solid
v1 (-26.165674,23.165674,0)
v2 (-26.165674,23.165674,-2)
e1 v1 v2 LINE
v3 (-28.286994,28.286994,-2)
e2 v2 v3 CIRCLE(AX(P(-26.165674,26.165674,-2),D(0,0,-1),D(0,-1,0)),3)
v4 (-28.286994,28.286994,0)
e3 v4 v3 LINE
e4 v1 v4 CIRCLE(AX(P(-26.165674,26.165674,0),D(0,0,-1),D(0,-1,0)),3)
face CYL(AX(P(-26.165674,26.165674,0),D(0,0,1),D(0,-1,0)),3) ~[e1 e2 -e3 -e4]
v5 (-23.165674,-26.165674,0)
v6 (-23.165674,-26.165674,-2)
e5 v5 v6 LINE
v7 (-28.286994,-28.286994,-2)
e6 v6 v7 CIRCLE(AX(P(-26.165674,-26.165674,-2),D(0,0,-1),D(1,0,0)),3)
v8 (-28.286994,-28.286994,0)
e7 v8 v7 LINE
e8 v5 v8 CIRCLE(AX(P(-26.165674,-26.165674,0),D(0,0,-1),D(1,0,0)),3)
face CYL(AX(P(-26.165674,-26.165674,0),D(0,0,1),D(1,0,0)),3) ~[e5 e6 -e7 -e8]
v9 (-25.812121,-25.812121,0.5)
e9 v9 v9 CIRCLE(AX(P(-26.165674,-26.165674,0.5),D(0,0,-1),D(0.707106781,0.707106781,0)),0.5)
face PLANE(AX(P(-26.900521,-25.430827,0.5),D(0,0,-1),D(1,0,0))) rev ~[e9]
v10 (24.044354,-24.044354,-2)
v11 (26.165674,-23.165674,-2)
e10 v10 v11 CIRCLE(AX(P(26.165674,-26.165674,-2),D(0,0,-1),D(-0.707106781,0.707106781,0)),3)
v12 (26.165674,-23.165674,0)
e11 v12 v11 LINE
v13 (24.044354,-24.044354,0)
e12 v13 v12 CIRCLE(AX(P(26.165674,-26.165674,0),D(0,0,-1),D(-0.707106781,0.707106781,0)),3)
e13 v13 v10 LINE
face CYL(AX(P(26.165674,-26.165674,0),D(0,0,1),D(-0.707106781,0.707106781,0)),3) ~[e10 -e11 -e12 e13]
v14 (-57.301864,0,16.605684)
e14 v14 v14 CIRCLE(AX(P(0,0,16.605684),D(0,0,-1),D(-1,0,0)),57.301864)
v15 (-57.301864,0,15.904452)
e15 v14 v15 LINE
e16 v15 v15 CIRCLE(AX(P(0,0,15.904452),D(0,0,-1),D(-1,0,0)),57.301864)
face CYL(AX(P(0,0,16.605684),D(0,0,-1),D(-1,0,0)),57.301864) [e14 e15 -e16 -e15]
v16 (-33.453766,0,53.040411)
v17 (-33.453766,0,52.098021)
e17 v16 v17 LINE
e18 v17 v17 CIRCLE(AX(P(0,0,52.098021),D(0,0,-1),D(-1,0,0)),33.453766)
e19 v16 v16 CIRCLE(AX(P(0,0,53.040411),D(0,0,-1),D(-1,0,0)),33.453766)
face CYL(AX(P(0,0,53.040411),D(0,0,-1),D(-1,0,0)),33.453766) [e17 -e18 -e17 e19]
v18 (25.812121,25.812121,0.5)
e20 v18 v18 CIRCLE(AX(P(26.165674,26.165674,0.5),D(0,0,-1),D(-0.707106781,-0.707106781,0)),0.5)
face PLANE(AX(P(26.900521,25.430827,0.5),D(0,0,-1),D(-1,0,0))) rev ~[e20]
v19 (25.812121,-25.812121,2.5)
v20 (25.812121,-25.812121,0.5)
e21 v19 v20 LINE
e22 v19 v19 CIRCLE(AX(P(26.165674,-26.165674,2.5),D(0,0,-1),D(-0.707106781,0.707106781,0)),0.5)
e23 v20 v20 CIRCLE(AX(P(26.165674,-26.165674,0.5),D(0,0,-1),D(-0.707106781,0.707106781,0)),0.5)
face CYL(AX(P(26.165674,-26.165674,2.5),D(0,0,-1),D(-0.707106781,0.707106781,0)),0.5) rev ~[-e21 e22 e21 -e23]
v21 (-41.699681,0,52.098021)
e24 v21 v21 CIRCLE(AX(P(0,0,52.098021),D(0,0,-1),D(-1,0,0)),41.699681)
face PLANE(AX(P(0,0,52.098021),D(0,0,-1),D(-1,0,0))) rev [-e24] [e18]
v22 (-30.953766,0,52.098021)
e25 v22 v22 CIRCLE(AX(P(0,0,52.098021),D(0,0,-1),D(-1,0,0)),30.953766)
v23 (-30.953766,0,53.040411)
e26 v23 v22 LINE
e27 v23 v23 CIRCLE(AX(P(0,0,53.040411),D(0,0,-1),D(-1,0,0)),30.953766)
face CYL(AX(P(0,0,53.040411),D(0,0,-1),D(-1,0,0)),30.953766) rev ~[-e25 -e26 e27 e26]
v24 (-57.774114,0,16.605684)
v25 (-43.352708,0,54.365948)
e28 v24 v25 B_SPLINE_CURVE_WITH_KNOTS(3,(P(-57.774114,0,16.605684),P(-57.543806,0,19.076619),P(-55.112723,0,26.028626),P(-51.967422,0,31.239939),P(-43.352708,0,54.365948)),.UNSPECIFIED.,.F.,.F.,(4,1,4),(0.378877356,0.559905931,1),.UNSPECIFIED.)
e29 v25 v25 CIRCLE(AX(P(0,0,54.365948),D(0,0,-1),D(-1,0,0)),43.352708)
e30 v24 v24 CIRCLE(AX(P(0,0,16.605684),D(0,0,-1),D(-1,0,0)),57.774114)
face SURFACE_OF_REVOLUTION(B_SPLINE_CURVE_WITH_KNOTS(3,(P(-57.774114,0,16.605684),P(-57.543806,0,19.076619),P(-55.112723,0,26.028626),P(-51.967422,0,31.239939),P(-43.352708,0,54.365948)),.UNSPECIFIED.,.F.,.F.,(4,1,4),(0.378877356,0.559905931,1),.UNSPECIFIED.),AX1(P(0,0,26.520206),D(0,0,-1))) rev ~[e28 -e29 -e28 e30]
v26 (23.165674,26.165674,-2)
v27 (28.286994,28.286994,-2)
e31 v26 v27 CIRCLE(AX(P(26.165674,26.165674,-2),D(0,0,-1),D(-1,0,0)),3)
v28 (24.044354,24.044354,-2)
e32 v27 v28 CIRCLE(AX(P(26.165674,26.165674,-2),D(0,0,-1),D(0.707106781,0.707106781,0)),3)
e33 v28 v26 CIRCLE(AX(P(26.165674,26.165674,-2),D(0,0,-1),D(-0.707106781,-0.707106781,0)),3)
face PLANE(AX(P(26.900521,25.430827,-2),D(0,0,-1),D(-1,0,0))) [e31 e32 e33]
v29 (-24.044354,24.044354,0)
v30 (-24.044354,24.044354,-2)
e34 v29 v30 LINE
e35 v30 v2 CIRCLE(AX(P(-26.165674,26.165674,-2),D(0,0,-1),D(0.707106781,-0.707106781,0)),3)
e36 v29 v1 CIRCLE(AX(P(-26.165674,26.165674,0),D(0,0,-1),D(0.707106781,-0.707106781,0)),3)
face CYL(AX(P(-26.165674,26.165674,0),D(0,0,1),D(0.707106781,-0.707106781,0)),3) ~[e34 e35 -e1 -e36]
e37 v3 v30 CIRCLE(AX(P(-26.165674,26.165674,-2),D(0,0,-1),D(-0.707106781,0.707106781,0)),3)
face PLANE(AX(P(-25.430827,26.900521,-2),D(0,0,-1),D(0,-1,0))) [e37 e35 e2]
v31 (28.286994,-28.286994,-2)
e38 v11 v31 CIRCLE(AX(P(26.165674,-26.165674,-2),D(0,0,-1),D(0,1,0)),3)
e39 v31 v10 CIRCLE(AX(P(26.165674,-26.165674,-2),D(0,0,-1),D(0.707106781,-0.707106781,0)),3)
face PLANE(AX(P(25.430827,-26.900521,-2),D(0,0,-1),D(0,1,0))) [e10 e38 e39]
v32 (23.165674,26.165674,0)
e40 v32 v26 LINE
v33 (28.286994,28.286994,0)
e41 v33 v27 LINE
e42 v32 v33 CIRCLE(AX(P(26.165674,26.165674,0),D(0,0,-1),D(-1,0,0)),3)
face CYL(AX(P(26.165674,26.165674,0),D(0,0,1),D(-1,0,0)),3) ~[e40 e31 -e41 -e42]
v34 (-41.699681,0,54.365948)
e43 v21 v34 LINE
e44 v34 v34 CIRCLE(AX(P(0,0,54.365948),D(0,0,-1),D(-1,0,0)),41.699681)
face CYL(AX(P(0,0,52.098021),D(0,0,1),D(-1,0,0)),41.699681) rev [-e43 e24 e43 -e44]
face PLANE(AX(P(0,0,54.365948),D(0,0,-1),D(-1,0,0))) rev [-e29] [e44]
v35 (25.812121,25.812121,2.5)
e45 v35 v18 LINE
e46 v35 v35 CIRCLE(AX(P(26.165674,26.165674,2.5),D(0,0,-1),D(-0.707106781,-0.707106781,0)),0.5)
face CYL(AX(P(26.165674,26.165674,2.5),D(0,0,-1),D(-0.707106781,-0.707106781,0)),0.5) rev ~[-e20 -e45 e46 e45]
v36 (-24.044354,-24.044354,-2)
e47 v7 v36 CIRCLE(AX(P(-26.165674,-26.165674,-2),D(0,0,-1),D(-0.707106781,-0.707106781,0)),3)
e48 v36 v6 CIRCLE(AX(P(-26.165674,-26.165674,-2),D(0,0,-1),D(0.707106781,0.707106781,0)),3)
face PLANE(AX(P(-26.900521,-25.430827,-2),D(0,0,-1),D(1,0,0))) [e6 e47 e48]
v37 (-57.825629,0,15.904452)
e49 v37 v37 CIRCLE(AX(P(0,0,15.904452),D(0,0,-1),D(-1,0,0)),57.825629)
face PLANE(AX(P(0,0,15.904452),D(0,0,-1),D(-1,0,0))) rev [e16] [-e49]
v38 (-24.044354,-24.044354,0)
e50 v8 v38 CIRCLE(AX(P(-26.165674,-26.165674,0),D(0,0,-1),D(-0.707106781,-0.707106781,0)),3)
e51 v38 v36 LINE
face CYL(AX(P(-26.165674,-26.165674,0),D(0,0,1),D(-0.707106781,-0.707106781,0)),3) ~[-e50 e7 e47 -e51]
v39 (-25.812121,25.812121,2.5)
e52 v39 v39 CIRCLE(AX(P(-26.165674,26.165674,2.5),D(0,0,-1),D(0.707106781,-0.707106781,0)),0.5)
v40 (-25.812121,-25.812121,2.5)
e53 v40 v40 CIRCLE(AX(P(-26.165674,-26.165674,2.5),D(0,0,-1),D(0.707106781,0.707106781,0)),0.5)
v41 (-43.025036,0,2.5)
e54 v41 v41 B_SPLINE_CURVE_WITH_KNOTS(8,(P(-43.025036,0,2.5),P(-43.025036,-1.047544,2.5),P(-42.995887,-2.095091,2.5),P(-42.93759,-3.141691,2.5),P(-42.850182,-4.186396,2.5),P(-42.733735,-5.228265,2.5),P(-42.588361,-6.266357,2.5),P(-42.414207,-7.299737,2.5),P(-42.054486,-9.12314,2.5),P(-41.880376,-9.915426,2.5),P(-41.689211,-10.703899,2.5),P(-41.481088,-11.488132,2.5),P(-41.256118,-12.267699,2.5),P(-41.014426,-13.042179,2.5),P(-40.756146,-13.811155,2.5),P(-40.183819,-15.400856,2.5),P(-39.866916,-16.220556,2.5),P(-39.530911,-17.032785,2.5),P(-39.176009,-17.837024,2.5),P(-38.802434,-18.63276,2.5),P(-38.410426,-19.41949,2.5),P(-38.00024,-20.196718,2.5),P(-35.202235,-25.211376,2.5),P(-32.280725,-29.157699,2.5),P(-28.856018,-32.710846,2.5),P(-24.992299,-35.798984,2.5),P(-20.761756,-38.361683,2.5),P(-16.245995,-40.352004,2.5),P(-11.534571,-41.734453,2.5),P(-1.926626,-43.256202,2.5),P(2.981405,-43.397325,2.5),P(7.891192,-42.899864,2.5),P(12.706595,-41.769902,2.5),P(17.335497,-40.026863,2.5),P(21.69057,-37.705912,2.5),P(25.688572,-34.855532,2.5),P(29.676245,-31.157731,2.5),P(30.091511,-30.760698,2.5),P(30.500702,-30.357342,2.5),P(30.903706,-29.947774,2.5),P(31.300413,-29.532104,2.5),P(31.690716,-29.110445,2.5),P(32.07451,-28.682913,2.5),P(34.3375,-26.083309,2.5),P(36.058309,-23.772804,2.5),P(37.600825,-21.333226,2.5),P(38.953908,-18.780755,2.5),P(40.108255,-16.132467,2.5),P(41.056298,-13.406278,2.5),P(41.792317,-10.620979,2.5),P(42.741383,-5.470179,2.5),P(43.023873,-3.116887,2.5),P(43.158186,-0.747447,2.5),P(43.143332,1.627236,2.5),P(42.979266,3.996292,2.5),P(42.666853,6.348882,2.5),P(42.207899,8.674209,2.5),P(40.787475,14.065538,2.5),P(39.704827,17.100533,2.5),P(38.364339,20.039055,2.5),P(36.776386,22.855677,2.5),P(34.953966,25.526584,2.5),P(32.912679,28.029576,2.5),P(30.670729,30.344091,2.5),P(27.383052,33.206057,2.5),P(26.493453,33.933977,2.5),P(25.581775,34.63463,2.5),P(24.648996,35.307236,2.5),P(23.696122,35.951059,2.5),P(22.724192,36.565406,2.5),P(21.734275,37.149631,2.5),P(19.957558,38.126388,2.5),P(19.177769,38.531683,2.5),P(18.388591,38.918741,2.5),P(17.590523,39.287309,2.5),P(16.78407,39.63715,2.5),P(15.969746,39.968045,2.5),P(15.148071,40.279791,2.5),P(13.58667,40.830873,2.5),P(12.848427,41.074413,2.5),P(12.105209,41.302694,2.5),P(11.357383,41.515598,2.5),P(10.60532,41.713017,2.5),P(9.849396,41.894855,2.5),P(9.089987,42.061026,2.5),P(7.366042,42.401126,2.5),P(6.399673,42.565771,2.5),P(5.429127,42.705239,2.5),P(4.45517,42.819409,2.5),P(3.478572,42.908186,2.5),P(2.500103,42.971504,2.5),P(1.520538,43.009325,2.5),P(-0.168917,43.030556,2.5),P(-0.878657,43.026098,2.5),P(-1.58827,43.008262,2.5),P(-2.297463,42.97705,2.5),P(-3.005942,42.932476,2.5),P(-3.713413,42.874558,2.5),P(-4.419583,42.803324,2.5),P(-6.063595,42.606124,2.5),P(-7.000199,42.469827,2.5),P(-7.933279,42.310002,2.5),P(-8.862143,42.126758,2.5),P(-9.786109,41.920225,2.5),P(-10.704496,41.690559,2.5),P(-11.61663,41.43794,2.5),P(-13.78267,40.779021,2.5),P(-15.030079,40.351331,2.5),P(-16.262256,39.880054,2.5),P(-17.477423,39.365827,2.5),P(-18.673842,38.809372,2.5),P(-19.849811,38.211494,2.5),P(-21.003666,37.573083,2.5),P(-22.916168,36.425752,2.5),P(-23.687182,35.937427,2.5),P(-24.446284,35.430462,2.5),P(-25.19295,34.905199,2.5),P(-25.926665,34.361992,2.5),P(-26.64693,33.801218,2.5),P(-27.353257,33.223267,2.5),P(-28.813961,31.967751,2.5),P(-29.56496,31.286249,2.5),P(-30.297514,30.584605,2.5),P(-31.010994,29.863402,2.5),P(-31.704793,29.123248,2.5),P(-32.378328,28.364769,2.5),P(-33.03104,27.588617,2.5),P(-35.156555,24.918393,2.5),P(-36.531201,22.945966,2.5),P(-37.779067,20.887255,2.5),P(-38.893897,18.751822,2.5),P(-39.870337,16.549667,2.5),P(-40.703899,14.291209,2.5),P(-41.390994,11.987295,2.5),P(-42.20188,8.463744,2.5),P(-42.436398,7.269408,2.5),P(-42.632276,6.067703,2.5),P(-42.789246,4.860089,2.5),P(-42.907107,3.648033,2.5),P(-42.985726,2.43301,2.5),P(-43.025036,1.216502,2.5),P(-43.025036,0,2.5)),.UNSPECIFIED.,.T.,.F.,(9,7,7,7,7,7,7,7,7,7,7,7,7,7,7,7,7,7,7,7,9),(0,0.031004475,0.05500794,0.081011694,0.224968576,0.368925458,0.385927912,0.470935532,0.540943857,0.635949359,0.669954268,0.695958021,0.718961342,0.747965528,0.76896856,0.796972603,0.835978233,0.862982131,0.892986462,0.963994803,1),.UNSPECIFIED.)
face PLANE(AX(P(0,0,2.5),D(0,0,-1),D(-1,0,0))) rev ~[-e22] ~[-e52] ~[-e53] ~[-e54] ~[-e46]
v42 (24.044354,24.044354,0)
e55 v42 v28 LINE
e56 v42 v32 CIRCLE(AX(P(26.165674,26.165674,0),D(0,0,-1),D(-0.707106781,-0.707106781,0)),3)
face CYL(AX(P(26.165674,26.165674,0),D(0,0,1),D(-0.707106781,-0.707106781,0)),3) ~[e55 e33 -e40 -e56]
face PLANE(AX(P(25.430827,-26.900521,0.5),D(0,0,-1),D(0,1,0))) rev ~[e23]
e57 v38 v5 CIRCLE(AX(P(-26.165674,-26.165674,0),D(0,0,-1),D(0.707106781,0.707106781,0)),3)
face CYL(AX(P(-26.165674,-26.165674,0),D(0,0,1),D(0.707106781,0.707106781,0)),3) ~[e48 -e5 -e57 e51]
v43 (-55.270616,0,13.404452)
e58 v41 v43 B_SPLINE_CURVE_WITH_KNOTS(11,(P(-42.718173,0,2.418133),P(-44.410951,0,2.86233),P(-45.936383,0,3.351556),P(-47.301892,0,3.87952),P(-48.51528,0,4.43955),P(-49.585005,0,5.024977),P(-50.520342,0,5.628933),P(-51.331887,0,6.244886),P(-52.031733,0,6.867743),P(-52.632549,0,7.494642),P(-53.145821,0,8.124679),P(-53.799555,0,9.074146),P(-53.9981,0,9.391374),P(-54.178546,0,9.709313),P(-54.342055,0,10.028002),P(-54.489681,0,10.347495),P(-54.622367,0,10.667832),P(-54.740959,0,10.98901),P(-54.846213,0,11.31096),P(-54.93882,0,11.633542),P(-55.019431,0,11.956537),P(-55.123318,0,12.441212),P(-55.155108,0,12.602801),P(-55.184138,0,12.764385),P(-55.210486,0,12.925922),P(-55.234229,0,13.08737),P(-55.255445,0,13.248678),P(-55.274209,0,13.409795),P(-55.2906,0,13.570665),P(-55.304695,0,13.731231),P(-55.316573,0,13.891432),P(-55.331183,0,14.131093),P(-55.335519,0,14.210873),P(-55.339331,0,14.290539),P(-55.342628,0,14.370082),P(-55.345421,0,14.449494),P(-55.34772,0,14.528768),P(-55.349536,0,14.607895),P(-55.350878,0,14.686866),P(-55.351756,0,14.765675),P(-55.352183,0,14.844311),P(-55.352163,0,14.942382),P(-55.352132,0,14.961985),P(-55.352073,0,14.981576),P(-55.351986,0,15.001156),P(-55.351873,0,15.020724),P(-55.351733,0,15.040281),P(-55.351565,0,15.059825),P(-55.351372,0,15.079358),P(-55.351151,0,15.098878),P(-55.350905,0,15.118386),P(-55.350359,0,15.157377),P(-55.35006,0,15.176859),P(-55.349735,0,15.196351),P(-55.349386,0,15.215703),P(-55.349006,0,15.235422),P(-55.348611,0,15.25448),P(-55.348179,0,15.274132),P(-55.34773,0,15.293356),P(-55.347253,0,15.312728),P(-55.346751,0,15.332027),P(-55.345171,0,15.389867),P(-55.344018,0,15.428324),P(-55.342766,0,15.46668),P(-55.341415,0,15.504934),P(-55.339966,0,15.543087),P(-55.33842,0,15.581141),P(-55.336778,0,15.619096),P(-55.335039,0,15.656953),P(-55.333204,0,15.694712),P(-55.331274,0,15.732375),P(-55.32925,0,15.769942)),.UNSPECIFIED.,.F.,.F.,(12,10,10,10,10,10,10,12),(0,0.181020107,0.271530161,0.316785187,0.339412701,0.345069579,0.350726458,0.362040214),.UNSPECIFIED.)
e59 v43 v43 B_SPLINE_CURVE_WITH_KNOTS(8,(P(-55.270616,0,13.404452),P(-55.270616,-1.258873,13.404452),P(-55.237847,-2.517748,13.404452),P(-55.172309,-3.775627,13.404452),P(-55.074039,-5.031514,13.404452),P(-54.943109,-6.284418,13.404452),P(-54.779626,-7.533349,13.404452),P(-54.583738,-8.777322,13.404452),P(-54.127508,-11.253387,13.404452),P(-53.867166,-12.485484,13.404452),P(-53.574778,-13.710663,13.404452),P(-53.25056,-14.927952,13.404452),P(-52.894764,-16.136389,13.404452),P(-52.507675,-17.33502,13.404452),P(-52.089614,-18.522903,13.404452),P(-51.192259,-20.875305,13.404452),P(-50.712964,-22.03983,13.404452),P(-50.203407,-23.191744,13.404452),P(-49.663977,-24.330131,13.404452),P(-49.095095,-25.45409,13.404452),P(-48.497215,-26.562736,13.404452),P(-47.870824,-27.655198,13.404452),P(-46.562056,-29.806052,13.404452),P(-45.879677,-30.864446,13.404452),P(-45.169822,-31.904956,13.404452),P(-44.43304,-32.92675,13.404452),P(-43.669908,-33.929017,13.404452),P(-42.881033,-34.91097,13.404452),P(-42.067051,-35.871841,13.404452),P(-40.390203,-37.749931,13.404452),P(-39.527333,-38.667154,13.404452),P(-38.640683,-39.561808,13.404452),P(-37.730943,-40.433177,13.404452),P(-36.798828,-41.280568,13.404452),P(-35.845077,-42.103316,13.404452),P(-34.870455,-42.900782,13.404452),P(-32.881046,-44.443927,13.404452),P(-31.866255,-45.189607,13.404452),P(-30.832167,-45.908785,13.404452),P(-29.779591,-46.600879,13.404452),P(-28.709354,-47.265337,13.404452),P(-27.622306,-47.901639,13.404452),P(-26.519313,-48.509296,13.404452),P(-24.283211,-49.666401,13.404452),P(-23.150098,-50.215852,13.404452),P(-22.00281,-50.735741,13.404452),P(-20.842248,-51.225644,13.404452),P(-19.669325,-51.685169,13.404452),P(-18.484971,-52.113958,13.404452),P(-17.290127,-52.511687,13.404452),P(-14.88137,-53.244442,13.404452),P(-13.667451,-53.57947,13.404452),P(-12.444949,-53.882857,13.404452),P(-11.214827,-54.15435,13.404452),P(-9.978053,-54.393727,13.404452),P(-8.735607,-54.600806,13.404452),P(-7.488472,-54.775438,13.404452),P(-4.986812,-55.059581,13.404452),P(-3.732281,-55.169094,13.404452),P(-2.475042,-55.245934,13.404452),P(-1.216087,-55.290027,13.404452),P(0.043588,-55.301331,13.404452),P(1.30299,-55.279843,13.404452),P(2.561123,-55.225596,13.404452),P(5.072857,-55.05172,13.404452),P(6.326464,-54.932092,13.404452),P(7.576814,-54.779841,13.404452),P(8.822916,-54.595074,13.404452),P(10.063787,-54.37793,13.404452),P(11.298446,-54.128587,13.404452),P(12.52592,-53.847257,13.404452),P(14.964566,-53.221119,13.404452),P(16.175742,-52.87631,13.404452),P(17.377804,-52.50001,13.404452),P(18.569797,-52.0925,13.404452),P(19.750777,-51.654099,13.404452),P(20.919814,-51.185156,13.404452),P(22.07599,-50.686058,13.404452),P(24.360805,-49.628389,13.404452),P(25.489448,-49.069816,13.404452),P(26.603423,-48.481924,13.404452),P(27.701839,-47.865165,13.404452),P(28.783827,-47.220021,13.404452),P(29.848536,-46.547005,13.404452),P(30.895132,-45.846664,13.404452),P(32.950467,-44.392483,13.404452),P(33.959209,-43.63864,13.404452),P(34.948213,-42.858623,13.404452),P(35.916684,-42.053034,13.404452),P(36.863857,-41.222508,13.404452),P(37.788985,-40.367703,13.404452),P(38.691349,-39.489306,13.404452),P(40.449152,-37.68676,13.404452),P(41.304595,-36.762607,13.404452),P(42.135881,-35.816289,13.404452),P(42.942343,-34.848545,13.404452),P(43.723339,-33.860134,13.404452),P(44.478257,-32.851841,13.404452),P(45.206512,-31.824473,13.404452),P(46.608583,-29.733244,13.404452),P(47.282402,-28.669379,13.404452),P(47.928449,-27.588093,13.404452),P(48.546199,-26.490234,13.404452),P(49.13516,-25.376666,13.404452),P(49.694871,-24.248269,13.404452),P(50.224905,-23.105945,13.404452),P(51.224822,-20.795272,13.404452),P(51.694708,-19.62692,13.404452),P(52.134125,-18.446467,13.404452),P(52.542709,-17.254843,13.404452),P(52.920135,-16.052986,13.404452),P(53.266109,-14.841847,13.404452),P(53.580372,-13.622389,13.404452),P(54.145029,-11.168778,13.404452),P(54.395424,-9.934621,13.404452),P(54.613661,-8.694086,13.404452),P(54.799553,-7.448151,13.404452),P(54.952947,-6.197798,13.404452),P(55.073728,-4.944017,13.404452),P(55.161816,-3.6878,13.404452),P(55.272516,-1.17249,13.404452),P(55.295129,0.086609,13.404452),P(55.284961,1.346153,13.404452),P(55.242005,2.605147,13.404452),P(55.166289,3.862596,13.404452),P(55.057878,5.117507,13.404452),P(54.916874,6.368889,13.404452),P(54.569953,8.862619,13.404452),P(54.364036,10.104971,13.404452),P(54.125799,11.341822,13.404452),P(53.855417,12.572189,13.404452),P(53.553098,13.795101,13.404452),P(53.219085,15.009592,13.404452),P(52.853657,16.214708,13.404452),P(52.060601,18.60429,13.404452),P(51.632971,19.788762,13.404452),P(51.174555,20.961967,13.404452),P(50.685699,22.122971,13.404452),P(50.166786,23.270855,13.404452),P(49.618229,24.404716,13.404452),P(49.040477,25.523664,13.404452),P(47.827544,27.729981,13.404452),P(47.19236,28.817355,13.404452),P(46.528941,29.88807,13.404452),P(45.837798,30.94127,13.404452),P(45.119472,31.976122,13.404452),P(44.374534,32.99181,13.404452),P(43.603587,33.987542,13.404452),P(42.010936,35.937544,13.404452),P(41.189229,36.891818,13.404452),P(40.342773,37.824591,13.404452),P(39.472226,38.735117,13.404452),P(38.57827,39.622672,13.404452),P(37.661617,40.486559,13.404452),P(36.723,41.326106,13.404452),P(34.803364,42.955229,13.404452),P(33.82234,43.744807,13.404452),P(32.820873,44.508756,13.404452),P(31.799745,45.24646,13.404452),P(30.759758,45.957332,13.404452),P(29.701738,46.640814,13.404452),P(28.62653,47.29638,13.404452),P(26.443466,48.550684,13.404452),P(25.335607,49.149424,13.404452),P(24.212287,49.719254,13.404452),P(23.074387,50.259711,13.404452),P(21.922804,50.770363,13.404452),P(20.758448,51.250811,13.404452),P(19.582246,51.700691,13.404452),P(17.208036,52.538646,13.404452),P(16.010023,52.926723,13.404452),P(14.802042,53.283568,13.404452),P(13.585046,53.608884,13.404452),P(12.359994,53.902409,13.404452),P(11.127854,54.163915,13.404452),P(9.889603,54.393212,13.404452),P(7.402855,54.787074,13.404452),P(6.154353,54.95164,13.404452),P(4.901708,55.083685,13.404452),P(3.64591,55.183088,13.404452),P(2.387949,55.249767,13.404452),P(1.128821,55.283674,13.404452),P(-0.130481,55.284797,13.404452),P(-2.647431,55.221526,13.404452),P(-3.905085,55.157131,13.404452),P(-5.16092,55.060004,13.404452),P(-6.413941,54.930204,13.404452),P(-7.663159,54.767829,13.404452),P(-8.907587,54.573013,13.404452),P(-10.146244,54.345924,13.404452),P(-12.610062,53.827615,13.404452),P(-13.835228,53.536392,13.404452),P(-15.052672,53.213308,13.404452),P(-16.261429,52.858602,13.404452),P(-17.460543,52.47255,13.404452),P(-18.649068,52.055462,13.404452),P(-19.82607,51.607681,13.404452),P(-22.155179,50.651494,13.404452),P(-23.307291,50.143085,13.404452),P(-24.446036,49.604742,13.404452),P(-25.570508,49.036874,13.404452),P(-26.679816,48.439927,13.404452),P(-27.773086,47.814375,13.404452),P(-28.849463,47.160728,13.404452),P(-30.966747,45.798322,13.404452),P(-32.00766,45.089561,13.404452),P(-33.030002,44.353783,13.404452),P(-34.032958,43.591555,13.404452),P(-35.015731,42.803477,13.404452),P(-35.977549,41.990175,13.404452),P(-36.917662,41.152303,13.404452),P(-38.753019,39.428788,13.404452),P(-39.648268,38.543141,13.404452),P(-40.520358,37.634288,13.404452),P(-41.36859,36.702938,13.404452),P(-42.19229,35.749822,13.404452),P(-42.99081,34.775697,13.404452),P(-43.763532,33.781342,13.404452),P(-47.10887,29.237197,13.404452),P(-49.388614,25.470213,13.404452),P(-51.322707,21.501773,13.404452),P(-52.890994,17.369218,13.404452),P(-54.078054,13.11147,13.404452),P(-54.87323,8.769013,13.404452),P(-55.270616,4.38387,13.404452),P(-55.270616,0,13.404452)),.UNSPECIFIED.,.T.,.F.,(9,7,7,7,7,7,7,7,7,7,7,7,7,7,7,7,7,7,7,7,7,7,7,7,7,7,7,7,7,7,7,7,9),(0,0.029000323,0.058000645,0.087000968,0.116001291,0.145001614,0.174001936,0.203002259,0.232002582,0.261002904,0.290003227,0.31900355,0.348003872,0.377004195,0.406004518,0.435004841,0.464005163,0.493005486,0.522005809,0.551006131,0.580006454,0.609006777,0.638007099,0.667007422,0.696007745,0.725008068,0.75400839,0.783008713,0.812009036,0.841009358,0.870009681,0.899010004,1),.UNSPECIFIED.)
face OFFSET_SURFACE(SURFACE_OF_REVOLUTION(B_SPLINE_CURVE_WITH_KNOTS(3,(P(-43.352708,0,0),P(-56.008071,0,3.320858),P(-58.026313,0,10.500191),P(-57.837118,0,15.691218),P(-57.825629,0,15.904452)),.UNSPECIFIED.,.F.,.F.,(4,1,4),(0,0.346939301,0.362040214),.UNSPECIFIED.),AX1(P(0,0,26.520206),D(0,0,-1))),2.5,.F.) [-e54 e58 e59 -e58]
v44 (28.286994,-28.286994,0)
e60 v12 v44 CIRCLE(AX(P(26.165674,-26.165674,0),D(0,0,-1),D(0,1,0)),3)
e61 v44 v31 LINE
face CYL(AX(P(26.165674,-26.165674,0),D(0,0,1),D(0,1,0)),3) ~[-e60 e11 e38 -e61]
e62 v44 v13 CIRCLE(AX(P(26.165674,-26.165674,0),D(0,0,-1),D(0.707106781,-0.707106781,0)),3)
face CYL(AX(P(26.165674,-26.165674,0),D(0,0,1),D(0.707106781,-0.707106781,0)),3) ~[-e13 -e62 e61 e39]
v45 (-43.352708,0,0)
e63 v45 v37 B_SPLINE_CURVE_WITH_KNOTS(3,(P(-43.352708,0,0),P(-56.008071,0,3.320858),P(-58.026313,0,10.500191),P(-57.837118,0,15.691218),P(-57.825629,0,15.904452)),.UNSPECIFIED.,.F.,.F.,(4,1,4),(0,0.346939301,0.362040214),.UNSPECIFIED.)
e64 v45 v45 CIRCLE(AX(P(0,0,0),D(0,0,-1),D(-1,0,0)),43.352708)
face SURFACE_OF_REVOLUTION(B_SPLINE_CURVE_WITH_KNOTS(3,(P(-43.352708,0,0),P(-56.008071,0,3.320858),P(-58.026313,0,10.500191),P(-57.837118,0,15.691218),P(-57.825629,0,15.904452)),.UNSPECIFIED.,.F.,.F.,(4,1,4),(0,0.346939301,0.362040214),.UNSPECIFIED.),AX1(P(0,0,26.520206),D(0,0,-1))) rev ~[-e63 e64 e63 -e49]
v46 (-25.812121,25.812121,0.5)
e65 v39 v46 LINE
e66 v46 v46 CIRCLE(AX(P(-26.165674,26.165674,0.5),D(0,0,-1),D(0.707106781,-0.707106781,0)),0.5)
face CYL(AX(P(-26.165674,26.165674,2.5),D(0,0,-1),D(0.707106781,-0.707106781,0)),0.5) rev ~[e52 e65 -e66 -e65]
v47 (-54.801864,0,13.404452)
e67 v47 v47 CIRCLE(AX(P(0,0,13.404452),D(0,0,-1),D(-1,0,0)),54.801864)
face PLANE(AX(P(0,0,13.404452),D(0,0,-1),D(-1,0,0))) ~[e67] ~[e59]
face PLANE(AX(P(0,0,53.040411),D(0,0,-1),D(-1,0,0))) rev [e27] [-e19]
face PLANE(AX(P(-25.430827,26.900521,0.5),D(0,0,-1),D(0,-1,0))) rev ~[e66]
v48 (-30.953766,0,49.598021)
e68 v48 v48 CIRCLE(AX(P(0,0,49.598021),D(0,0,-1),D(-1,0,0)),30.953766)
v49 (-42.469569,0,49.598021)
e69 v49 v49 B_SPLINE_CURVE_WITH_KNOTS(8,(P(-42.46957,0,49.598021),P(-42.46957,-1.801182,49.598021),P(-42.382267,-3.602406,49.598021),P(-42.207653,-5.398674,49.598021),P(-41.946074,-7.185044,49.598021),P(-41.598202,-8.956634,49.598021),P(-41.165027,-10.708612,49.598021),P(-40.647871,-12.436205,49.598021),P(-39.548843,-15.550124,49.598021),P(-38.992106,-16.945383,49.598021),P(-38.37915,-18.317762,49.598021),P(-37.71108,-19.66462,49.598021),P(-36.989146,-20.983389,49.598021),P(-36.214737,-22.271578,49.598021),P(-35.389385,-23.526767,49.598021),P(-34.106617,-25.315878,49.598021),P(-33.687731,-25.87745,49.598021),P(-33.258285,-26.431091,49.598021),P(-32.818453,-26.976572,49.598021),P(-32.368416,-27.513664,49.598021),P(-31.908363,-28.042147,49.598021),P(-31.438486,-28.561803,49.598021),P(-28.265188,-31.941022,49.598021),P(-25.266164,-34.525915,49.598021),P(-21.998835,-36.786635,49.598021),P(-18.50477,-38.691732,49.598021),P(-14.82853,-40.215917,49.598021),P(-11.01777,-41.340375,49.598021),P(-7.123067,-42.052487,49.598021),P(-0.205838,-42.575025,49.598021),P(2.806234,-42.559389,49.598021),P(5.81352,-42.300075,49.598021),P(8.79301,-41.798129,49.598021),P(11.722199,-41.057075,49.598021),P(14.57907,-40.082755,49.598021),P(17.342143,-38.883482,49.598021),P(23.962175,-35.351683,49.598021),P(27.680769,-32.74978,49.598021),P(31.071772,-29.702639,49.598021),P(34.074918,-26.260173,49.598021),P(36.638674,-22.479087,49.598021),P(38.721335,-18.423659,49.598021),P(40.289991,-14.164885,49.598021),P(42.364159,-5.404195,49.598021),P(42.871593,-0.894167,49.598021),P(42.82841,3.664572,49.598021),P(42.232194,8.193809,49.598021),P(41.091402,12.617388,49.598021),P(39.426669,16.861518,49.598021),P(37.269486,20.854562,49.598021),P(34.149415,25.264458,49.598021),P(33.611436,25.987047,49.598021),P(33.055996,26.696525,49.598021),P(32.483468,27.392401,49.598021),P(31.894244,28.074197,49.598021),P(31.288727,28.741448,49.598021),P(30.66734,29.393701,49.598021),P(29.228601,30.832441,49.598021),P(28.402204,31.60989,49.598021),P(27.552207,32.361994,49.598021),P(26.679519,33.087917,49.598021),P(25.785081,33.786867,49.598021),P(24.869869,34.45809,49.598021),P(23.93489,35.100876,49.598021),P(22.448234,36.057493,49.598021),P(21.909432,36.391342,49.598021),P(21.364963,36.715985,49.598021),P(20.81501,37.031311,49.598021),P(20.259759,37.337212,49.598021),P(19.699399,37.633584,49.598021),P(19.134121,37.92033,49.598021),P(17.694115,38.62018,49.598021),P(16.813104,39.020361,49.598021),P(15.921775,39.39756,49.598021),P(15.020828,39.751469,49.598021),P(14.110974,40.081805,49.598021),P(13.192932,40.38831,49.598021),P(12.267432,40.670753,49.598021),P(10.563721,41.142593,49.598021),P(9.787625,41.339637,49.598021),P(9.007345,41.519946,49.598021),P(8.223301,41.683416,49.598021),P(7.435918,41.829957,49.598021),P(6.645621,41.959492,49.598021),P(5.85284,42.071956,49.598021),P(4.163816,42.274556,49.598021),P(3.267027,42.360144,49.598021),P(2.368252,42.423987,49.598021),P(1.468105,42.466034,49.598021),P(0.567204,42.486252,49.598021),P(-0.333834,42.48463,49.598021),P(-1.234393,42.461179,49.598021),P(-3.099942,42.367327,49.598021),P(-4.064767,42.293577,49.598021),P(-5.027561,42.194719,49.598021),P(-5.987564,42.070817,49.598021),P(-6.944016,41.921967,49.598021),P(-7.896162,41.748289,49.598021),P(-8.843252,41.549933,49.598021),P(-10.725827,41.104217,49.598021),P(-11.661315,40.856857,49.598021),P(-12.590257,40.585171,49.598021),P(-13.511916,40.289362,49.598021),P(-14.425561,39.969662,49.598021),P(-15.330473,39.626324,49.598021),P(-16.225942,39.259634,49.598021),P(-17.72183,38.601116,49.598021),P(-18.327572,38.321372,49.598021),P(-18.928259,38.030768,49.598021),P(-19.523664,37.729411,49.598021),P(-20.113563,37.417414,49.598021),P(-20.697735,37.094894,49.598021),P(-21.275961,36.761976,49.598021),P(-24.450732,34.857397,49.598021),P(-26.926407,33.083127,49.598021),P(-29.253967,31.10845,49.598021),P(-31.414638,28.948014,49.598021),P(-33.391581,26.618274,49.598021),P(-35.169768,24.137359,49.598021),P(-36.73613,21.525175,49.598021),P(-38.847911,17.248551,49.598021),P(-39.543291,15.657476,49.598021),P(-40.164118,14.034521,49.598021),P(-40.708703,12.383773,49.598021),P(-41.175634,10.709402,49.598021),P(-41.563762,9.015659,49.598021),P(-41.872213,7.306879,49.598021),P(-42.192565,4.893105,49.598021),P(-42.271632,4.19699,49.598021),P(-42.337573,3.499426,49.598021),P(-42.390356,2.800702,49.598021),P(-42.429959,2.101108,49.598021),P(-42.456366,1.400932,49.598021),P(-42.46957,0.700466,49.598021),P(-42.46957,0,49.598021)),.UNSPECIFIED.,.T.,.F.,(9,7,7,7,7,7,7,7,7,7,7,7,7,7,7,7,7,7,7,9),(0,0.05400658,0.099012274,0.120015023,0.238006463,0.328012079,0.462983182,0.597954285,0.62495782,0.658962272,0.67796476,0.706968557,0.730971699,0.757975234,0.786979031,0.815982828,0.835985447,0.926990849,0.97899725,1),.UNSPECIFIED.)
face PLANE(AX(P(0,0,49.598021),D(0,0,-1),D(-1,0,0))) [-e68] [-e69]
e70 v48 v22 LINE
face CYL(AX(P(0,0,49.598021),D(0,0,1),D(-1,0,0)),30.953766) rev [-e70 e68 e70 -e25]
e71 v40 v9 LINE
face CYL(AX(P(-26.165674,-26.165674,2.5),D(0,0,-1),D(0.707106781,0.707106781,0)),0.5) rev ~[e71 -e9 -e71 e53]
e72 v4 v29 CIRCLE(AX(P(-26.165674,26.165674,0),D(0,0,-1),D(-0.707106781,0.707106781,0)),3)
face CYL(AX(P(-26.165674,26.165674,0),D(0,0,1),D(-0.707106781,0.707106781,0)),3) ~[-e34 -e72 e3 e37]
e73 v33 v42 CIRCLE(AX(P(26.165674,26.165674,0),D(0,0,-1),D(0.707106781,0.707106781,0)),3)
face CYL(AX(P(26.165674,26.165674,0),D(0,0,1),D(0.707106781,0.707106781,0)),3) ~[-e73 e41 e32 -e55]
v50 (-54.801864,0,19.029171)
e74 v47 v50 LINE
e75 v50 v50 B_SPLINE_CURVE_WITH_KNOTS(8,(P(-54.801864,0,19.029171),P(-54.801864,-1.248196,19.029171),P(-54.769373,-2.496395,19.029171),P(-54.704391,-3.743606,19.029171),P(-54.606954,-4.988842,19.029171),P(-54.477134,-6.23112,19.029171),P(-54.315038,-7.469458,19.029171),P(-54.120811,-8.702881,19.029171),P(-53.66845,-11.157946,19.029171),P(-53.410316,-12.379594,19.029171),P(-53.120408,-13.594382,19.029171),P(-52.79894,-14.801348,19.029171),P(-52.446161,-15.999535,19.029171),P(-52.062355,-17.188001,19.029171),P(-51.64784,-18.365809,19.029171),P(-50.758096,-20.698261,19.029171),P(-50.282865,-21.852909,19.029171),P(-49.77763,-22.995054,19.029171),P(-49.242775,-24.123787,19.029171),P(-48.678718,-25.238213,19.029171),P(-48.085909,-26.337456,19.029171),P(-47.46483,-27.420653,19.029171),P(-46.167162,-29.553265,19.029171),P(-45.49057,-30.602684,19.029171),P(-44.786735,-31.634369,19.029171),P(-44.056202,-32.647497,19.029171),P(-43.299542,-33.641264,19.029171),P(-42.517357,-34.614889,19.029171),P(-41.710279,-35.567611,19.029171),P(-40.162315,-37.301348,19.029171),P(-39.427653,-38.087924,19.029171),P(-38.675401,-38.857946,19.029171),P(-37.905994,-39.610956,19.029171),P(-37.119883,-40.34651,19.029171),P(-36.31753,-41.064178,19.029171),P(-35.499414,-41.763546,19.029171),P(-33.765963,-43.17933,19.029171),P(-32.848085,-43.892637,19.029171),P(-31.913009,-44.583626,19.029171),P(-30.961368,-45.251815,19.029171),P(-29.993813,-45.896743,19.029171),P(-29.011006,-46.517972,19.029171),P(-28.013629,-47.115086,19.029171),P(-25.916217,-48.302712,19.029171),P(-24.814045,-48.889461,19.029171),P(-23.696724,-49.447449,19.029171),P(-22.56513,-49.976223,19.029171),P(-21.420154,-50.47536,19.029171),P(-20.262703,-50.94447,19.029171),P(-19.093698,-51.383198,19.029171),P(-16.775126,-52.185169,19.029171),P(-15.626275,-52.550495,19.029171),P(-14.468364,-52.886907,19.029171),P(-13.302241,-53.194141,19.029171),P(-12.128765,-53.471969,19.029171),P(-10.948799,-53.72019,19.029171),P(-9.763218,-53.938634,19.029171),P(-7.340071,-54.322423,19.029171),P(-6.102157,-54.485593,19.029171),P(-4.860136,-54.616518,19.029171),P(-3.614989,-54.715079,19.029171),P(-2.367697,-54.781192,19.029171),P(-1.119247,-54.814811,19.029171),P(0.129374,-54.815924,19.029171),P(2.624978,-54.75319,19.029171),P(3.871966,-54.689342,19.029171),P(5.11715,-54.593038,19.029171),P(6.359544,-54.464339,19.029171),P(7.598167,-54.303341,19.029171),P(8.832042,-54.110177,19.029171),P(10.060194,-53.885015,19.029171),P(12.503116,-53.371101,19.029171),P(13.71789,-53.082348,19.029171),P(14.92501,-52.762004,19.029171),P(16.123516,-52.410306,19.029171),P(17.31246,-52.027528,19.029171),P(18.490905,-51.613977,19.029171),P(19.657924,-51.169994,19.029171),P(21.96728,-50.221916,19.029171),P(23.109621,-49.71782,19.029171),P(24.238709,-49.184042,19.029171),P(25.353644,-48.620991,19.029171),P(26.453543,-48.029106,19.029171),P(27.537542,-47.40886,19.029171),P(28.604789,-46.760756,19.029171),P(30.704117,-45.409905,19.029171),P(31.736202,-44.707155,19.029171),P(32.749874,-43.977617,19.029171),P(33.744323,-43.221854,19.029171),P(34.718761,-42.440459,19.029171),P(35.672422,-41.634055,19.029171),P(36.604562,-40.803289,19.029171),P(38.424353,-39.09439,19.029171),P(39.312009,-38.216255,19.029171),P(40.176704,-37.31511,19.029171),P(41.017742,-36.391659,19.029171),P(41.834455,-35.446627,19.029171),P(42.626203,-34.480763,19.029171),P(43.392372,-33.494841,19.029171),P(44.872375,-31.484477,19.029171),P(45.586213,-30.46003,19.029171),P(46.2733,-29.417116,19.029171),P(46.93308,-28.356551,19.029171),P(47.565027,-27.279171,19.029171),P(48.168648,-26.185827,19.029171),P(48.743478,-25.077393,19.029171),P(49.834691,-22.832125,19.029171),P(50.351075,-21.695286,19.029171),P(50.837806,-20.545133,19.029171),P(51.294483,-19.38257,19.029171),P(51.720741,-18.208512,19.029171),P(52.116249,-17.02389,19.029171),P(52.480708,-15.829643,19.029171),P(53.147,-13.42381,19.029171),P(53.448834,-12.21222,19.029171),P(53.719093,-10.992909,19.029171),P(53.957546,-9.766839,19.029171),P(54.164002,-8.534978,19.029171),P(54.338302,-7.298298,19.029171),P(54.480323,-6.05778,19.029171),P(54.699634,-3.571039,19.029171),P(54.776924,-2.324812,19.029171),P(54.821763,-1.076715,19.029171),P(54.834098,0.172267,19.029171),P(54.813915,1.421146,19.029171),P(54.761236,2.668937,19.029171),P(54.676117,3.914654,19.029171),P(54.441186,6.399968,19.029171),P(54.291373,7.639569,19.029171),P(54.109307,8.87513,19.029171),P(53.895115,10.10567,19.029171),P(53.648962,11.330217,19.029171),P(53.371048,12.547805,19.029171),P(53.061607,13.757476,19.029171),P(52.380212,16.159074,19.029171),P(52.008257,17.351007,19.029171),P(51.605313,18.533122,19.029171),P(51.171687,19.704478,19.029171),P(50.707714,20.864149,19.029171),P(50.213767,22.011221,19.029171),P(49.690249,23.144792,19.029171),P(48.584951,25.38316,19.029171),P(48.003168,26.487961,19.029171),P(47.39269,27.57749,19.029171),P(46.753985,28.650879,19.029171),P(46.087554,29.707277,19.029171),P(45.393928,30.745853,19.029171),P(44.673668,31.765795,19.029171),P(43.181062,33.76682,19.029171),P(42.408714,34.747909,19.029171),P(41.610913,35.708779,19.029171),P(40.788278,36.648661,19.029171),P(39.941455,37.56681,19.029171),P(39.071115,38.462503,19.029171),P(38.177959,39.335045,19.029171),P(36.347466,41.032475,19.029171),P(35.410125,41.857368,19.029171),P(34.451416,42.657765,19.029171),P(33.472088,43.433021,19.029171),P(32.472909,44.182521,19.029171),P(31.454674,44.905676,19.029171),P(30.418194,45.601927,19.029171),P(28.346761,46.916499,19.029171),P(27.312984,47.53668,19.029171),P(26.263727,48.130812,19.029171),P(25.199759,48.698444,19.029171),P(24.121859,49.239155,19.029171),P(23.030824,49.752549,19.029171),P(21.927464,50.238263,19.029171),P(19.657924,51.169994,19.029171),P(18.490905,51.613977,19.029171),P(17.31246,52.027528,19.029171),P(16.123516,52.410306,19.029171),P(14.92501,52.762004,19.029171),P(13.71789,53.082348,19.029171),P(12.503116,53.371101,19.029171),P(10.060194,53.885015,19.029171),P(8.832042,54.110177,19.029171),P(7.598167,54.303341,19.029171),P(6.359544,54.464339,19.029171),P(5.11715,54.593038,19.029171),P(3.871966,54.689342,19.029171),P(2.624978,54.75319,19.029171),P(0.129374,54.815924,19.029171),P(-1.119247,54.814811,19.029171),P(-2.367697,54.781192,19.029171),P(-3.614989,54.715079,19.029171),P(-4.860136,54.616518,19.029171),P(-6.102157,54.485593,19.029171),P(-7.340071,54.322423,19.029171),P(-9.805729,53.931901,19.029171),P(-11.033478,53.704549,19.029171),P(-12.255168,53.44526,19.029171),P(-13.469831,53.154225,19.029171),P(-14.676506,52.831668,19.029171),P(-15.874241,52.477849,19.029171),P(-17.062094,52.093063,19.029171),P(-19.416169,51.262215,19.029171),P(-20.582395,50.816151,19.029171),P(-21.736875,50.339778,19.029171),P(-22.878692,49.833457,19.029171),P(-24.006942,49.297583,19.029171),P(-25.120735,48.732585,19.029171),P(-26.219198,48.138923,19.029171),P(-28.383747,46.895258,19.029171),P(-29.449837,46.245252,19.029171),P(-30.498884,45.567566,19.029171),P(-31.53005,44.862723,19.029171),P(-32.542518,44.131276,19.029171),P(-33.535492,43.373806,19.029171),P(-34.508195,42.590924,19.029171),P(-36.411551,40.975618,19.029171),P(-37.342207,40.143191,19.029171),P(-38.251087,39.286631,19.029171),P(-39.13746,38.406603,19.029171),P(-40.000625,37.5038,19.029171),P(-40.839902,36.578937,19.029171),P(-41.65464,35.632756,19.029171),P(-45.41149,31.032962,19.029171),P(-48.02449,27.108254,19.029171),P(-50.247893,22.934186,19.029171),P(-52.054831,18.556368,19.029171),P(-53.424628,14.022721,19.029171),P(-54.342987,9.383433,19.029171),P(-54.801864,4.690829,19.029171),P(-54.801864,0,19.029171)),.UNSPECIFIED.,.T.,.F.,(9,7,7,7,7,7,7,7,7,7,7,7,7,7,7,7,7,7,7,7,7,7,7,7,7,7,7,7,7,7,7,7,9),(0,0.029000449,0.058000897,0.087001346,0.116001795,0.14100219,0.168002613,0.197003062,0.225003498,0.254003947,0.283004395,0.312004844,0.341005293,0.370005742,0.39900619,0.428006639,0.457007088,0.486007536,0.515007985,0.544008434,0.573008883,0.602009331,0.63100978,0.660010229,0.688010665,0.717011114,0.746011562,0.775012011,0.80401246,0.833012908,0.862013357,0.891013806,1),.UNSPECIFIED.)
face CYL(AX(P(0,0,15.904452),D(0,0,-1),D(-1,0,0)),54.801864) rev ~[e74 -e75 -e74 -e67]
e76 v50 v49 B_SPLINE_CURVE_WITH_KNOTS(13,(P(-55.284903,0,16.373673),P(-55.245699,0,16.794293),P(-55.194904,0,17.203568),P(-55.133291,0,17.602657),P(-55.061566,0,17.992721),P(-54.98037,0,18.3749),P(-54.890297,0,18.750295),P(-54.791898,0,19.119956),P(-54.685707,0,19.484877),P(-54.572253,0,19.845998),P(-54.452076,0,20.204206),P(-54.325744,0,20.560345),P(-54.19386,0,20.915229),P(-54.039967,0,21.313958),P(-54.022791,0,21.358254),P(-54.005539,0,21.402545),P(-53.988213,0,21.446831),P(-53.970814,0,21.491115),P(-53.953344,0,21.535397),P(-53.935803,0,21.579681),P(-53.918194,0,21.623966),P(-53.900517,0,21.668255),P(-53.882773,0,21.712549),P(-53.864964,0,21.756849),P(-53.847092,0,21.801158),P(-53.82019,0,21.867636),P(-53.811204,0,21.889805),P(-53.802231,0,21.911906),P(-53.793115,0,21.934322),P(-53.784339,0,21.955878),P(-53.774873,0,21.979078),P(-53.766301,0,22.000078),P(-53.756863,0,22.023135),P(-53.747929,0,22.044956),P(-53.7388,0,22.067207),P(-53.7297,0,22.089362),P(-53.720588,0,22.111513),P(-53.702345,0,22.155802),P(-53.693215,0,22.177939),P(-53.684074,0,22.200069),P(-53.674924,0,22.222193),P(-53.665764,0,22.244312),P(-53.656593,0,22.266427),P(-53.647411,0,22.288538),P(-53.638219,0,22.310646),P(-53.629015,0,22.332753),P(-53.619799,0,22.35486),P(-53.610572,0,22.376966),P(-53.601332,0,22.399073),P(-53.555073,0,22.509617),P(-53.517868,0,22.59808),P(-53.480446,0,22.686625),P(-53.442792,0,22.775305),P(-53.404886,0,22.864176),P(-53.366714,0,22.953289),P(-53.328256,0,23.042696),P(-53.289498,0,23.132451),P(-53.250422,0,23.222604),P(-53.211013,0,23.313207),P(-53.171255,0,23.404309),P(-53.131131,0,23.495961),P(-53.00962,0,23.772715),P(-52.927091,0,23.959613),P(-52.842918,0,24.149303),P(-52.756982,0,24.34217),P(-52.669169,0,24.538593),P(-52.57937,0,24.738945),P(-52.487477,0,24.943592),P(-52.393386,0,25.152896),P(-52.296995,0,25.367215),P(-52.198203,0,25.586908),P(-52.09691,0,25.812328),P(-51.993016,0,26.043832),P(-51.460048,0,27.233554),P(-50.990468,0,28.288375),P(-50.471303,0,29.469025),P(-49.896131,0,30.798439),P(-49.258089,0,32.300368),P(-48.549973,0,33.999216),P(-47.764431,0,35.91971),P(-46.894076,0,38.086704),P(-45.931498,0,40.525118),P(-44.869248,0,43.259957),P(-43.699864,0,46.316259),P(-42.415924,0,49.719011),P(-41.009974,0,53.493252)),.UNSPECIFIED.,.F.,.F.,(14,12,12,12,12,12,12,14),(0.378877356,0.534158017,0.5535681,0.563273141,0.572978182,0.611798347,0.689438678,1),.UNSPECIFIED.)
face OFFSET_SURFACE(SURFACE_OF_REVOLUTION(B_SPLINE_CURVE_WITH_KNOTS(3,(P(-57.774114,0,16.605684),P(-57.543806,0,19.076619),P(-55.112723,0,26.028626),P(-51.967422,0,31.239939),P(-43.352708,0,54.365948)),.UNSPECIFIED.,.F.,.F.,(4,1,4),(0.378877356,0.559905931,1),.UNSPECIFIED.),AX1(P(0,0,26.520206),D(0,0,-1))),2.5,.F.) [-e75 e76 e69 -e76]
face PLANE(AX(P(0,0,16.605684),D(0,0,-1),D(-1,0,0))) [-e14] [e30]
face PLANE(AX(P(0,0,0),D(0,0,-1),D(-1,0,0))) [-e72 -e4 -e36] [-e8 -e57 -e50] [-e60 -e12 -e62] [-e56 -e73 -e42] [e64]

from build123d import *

# Parameters (mm, degrees)
F3_DEPTH        = 2
F3_COPIES_COUNT = 4
F4_T            = 2.5


# Not quite as in the source:
# - a pattern or mirror of a feature is missing from the dataset's text; its kind, count and spacing are read off the source's solid
# - a shell that OpenCascade refuses in one call is made with other operations: the cavity is built on its own and cut out


with BuildPart() as f1:
    # F0 (on Front) → F1 (revolve)
    with BuildSketch(Plane.XZ):
        with BuildLine():
            Line((-43.3527082205, 0), (0, 0))
            Line((0, 0), (0, 53.0404113233))
            Line((0, 53.0404113233), (-33.4537662566, 53.0404113233))
            Line((-33.4537662566, 53.0404113233), (-33.4537662566, 52.0980209112))
            Line((-33.4537662566, 52.0980209112), (-41.6996814311, 52.0980209112))
            Line((-41.6996814311, 52.0980209112), (-41.6996814311, 54.3659478426))
            Line((-41.6996814311, 54.3659478426), (-43.3527082205, 54.3659478426))
            add(Edge.make_bspline(
                [(-57.774114346, 16.6056844133), (-57.5438064684, 19.0766188083), (-55.1127232743, 26.0286261422), (-51.9674220523, 31.2399392322), (-43.3527082205, 54.3659478426)],
                knots=[0.378877356, 0.378877356, 0.378877356, 0.378877356, 0.5599059311, 1, 1, 1, 1], degree=3))
            Line((-57.774114346, 16.6056844133), (-57.301864028, 16.6056844133))
            Line((-57.301864028, 16.6056844133), (-57.301864028, 15.9044522338))
            Line((-57.301864028, 15.9044522338), (-57.825628846, 15.9044522338))
            add(Edge.make_bspline(
                [(-43.3527082205, 0), (-56.0080710607, 3.3208582414), (-58.0263130937, 10.5001905359), (-57.8371183322, 15.6912182455), (-57.825628846, 15.9044522338)],
                knots=[0, 0, 0, 0, 0.3469393009, 0.3620402142, 0.3620402142, 0.3620402142, 0.3620402142], degree=3))
        make_face()
    revolve(axis=Axis((0, 0, 26.5202056617), (0, 0, -1)))

    # F2 (on face) → F3 (join)
    with BuildSketch(Plane(origin=(0, 0, 0), x_dir=(1, 0, 0), z_dir=(0, 0, -1))):
        with BuildLine():
            ThreePointArc((-28.2869943814, 28.2869943814), (-28.2869943814, 24.0443536943), (-24.0443536943, 24.0443536943))
            Line((-24.0443536943, 24.0443536943), (-28.2869943814, 28.2869943814))
        make_face()
        with BuildLine():
            Line((-28.2869943814, 28.2869943814), (-24.0443536943, 24.0443536943))
            ThreePointArc((-24.0443536943, 24.0443536943), (-23.3940354403, 25.0176237408), (-23.1656740379, 26.1656740379))
            ThreePointArc((-23.1656740379, 26.1656740379), (-25.0176237408, 28.9373126354), (-28.2869943814, 28.2869943814))
        make_face()
    f3 = extrude(amount=F3_DEPTH)

    # F3_copies: F3 ×4 about axis
    f3_copies_axis = Axis((0, 0, 0), (0, 0, 1))
    for i in range(1, F3_COPIES_COUNT):
        add(f3.rotate(f3_copies_axis, i * 360 / F3_COPIES_COUNT))

    # F4: shell of thickness 2.5, made by hand


with BuildPart() as f4_core1:
    # F4_t2: copy of F1
    add(f1.part)

    # the walls: a layer under each face that stays
    f4_faces = [f4_core1.faces().sort_by_distance(p)[0] for p in [
        (-50.5523500528, -27.8171661666, 16.6056844133),
        (54.1679502624, 0, 27.3038486835),
        (57.301864028, 0, 16.2550683235),
        (-40.4625276724, -11.5607221921, 54.3659478426),
        (50.5974252403, -27.8419694444, 15.9044522338),
        (41.6996814311, 0, 53.2319843769),
        (55.6407613411, 0, 7.3399005986),
        (-27.7997876207, -27.7997876207, 52.0980209112),
        (0, 0, 0),
        (33.4537662566, 0, 52.5692161173),
        (28.2869943814, -28.2869943814, -1),
        (-28.2869943814, -28.2869943814, -1),
        (28.2869943814, 28.2869943814, -1),
        (-28.2869943814, 28.2869943814, -1),
        (26.1656740379, -26.1656740379, -2),
        (-26.1656740379, -26.1656740379, -2),
        (26.1656740379, 26.1656740379, -2),
        (-26.1656740379, 26.1656740379, -2),
    ]]
    thicken(f4_faces, amount=-F4_T, mode=Mode.SUBTRACT)

    # F4_s3 → F4_t4 (revolve, cut)
    with BuildSketch(Plane.XZ):
        Polygon((-57.326864028, 16.5806844133), (-57.301864028, 19.1056844133), (-54.801864028, 19.1056844133), (-54.801864028, 16.6056844133), align=None)
    revolve(axis=Axis((0, 0, 16.6056844133), (0, 0, -1)), mode=Mode.SUBTRACT)

    # F4_s5 → F4_t6 (revolve, cut)
    with BuildSketch(Plane.XZ):
        Polygon((-57.326864028, 15.9294522338), (-54.801864028, 15.9044522338), (-54.801864028, 13.4044522338), (-57.301864028, 13.4044522338), align=None)
    revolve(axis=Axis((0, 0, 15.9044522338), (0, 0, -1)), mode=Mode.SUBTRACT)

    # F4_s7 → F4_t8 (revolve, cut)
    with BuildSketch(Plane.XZ):
        Polygon((-41.6746814311, 52.1230209112), (-44.1996814311, 52.0980209112), (-44.1996814311, 49.5980209112), (-41.6996814311, 49.5980209112), align=None)
    revolve(axis=Axis((0, 0, 52.0980209112), (0, 0, -1)), mode=Mode.SUBTRACT)

    # F4_s9 → F4_t10 (revolve, cut)
    with BuildSketch(Plane.XZ):
        Polygon((-33.4787662566, 52.1230209112), (-33.4537662566, 49.5980209112), (-30.9537662566, 49.5980209112), (-30.9537662566, 52.0980209112), align=None)
    revolve(axis=Axis((0, 0, 52.0980209112), (0, 0, -1)), mode=Mode.SUBTRACT)

    # F4_s11 → F4_t12 (revolve, cut)
    with BuildSketch(Plane(origin=(0, 0, 0), x_dir=(0, 0, 1), z_dir=(-0.7071067812, -0.7071067812, 0))):
        Polygon((-0.025, -33.978851093), (2.5, -34.003851093), (2.5, -36.503851093), (0, -36.503851093), align=None)
    revolve(axis=Axis((26.1656740379, -26.1656740379, 0), (0, 0, -1)), mode=Mode.SUBTRACT)

    # F4_s13 → F4_t14 (revolve, cut)
    with BuildSketch(Plane(origin=(0, 0, 0), x_dir=(0, 0, 1), z_dir=(-0.7071067812, 0.7071067812, 0))):
        Polygon((-0.025, -33.978851093), (2.5, -34.003851093), (2.5, -36.503851093), (0, -36.503851093), align=None)
    revolve(axis=Axis((-26.1656740379, -26.1656740379, 0), (0, 0, -1)), mode=Mode.SUBTRACT)

    # F4_s15 → F4_t16 (revolve, cut)
    with BuildSketch(Plane(origin=(0, 0, 0), x_dir=(0, 0, 1), z_dir=(0.7071067812, -0.7071067812, 0))):
        Polygon((-0.025, -33.978851093), (2.5, -34.003851093), (2.5, -36.503851093), (0, -36.503851093), align=None)
    revolve(axis=Axis((26.1656740379, 26.1656740379, 0), (0, 0, -1)), mode=Mode.SUBTRACT)

    # F4_s17 → F4_t18 (revolve, cut)
    with BuildSketch(Plane(origin=(0, 0, 0), x_dir=(0, 0, 1), z_dir=(0.7071067812, 0.7071067812, 0))):
        Polygon((-0.025, -33.978851093), (2.5, -34.003851093), (2.5, -36.503851093), (0, -36.503851093), align=None)
    revolve(axis=Axis((-26.1656740379, 26.1656740379, 0), (0, 0, -1)), mode=Mode.SUBTRACT)


with BuildPart() as f1_1:
    add(f1.part)

    # what is left inside the walls is the cavity
    f4_cavity = [f4_core1.part.solids().sort_by_distance(p)[0] for p in [
        (52.796181, 0, 24.191952),
    ]]
    add(f4_cavity, mode=Mode.SUBTRACT)


solid = f1_1.part
